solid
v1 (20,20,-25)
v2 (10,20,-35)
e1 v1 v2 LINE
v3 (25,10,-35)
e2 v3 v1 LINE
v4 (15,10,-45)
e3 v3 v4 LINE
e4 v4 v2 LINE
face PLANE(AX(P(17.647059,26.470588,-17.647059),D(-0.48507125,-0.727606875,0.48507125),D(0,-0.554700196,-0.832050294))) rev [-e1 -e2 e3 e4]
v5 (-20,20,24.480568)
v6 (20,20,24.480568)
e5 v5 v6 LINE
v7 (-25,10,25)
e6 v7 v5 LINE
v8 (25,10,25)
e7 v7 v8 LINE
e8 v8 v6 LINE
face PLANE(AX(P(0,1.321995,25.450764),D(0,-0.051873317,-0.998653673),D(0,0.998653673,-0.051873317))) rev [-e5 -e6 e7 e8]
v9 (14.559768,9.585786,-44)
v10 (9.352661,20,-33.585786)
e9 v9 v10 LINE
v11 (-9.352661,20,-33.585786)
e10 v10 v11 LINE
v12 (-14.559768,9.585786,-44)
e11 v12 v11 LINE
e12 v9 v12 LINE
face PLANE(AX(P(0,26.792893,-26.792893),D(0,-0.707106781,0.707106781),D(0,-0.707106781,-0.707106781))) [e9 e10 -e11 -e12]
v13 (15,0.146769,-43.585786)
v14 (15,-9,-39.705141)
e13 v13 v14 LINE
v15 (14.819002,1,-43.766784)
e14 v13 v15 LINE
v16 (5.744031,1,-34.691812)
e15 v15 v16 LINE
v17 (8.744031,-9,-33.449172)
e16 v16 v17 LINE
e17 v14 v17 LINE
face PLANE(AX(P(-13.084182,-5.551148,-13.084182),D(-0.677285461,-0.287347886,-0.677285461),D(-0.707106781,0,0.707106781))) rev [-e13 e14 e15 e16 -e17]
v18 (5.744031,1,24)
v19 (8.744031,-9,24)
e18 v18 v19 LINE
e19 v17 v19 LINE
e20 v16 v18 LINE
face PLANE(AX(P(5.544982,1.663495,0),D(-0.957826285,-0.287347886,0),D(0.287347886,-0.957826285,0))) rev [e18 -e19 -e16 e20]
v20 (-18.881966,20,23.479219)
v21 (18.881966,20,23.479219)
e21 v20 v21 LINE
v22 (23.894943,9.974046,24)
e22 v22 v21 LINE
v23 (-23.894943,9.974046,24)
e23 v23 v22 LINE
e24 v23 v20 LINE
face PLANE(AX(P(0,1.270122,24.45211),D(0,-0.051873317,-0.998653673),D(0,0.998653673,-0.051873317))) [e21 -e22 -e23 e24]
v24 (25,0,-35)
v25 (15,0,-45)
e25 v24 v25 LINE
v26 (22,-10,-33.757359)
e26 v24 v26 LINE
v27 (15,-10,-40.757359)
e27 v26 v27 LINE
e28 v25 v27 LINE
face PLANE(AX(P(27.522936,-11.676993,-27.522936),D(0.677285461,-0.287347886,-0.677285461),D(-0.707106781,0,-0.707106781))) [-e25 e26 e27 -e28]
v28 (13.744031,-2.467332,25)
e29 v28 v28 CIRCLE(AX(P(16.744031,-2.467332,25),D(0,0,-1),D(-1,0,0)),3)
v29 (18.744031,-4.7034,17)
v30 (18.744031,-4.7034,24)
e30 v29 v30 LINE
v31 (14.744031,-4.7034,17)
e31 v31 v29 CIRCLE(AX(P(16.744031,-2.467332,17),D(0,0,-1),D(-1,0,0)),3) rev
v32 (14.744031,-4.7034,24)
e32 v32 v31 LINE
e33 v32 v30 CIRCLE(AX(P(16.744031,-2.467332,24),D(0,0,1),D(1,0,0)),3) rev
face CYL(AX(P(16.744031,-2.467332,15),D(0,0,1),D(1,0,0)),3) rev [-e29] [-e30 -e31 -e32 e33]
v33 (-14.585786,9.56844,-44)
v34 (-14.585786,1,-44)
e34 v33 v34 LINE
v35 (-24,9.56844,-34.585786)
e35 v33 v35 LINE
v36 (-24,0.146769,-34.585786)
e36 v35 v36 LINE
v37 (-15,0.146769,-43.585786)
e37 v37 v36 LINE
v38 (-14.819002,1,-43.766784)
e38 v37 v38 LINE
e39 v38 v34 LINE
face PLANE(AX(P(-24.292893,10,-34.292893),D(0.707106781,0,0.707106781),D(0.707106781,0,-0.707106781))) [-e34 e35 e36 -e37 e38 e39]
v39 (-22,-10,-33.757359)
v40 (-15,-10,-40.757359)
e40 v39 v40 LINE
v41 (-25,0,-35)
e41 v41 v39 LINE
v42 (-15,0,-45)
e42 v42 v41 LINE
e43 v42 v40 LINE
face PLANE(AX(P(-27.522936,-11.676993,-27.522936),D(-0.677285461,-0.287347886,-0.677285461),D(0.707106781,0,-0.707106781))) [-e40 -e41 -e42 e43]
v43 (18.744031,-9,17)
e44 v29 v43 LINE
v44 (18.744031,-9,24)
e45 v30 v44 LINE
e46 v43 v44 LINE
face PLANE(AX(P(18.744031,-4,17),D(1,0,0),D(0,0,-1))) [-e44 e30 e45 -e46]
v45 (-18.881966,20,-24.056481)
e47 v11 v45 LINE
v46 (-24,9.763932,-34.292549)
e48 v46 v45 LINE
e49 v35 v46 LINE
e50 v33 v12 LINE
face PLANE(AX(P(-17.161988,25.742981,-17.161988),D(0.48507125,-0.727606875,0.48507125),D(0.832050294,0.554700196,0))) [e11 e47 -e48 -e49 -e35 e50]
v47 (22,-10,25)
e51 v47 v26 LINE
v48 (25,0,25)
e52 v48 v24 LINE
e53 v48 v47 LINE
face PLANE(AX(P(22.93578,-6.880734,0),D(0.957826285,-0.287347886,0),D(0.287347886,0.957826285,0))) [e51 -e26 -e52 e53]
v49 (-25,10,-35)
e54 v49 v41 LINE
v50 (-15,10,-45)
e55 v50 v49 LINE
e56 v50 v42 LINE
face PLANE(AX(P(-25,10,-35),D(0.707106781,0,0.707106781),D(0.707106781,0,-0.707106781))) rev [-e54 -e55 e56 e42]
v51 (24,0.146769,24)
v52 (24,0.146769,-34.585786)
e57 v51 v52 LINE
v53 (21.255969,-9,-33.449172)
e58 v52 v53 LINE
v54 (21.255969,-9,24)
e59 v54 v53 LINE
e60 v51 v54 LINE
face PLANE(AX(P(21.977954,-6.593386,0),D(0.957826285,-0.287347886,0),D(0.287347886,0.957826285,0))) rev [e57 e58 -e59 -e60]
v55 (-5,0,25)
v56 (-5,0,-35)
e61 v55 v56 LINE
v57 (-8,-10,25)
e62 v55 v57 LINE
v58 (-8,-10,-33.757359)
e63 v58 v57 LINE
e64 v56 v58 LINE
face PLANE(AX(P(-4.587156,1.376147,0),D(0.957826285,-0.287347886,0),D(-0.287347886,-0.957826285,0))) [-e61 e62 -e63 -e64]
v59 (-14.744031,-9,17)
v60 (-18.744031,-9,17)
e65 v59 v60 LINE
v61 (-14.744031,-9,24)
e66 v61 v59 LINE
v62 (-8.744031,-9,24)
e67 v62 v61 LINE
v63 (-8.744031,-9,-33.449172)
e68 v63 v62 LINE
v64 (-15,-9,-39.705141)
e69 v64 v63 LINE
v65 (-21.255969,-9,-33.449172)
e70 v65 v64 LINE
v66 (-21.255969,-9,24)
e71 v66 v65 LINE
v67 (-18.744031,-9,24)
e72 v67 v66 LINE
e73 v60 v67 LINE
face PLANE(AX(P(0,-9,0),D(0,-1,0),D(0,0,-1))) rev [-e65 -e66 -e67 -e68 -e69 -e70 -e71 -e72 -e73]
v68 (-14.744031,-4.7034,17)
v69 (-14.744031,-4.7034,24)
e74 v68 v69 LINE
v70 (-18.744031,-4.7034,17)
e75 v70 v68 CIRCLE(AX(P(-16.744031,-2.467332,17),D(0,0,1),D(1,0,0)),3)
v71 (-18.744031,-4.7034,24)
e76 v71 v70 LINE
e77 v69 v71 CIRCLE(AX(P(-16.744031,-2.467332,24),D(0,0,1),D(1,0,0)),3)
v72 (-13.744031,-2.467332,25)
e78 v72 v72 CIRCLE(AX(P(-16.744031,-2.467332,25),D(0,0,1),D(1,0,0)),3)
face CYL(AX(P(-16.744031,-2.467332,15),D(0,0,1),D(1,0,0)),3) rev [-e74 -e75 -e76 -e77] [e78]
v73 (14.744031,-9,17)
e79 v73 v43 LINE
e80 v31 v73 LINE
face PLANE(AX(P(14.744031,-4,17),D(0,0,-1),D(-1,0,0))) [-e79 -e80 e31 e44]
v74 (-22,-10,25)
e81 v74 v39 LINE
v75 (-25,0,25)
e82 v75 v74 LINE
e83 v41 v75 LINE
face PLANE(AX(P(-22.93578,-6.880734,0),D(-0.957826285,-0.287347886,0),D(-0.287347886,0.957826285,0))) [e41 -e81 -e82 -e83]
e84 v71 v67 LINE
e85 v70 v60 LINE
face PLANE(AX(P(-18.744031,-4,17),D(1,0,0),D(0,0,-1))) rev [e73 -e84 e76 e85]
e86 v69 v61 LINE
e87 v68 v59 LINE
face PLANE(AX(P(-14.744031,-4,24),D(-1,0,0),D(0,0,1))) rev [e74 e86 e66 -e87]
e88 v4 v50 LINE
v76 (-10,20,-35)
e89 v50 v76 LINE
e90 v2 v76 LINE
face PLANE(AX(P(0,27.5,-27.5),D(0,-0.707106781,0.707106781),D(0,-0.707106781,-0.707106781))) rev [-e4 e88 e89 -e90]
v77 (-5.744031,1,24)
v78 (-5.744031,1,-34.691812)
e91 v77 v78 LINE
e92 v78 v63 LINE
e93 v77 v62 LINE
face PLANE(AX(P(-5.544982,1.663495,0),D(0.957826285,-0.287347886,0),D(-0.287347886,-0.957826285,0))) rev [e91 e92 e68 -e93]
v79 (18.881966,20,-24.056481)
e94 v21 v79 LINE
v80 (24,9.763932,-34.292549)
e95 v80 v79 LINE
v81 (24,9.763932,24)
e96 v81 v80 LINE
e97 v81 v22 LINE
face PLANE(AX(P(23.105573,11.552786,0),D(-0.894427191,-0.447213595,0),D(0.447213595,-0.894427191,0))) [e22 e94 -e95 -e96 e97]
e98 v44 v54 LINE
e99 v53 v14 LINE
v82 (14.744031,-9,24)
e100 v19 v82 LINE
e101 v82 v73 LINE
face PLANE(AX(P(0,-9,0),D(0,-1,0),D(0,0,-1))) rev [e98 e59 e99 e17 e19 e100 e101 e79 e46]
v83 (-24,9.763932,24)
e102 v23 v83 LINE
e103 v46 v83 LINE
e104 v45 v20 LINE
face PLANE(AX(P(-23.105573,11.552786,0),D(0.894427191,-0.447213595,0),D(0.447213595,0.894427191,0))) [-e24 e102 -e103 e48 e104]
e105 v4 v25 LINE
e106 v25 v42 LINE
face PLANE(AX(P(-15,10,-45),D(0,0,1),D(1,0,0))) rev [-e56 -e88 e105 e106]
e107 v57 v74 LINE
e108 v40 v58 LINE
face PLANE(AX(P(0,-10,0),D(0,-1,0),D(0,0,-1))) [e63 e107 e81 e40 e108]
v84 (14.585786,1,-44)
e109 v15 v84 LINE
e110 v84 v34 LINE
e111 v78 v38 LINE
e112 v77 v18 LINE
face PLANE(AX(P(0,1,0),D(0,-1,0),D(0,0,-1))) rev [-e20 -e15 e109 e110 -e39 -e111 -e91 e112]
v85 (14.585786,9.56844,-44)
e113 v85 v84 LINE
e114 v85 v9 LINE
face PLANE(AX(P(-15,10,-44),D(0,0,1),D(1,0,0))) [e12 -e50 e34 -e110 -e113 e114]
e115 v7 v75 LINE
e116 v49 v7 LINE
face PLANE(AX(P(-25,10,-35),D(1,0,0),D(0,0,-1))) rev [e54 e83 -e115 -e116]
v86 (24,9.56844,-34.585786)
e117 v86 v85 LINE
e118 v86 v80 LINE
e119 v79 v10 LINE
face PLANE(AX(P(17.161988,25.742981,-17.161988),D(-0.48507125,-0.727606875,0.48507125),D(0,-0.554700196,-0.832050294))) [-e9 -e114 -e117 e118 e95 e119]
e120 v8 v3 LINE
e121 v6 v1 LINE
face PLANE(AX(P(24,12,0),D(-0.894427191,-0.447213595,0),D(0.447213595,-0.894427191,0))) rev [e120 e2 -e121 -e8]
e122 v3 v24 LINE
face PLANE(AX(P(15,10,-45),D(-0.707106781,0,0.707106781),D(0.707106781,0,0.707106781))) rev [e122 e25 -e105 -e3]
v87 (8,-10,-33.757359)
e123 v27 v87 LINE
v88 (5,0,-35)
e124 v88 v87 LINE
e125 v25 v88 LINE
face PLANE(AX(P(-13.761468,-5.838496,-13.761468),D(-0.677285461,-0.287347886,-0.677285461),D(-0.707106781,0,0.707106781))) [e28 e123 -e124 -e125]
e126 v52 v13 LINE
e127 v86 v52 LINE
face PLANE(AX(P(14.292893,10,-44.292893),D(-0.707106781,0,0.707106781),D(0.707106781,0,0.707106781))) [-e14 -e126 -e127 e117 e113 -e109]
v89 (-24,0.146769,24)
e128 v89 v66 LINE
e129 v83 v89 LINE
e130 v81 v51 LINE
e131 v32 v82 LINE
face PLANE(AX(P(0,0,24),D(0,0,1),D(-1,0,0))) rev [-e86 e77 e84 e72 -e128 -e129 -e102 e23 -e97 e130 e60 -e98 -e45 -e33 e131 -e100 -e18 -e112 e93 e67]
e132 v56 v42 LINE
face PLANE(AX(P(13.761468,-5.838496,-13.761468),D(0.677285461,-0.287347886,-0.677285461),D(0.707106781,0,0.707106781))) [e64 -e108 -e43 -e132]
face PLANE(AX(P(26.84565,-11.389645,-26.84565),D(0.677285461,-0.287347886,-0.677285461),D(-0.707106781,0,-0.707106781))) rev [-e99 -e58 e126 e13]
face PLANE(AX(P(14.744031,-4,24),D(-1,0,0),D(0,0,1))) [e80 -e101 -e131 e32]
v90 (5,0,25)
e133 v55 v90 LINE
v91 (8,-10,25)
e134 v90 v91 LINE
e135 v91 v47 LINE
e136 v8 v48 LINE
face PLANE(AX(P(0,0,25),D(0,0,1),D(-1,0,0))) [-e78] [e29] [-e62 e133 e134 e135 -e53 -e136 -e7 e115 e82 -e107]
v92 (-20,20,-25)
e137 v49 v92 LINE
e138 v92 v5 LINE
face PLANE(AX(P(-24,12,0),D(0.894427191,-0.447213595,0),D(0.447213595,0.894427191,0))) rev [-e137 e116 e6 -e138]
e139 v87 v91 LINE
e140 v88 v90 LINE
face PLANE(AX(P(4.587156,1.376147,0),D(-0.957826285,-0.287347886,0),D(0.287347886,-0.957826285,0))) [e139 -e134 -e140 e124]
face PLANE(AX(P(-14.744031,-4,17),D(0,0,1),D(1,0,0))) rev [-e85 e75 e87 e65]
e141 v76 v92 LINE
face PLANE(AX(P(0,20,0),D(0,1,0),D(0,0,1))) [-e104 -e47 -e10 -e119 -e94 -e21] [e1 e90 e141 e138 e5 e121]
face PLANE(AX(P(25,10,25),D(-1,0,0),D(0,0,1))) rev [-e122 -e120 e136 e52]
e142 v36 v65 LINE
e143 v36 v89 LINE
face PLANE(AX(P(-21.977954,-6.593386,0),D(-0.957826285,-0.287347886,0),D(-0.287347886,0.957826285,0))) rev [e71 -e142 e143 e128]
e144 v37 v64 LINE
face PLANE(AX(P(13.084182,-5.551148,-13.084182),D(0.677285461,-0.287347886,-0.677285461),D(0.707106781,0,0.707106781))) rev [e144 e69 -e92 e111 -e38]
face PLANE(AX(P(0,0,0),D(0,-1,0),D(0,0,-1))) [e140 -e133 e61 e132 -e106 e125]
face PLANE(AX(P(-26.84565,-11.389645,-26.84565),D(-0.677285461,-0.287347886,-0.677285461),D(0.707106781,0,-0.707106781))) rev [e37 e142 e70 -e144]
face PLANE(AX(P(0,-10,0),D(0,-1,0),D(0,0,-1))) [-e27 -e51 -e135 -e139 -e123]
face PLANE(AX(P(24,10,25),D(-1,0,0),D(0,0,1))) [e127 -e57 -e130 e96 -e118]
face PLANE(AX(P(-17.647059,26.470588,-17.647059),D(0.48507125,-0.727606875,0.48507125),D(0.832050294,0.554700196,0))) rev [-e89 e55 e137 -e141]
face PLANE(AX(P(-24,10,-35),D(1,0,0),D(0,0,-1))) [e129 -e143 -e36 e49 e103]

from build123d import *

# Parameters (mm, degrees)
EXTRUDE_1_DEPTH     = 10
SHELL_2_T           = -1
SKETCH_8_W          = 4
SKETCH_8_H          = 7
EXTRUDE_3_DEPTH     = 5
SKETCH_9_R          = 3
CUT_EXTRUDE_1_DEPTH = 10


with BuildPart() as part:
    # 草图3 → 凸台-拉伸1 (new body)
    with BuildSketch(Plane(origin=(0, 0, 0), x_dir=(1, 0, 0), z_dir=(0, 1, 0))):
        Polygon((-25, 35), (-25, -25), (25, -25), (25, 35), (15, 45), (-15, 45), align=None)
    extrude(amount=EXTRUDE_1_DEPTH)


with BuildPart() as body_2:
    # 草图5 → 放样1 section 0
    with BuildSketch(Plane(origin=(0, 0, 0), x_dir=(1, 0, 0), z_dir=(0, 1, 0))):
        with BuildLine():
            Line((25, 35), (15, 45))
            Line((15, 45), (5, 35))
            Line((5, 35), (5, -25))
            Line((5, -25), (25, -25))
            Line((25, -25), (25, 35))
        make_face()
    # 草图6 → 放样1 section 1
    with BuildSketch(Plane(origin=(0, -10, 0), x_dir=(1, 0, 0), z_dir=(0, 1, 0))):
        with BuildLine():
            Line((22, -25), (8, -25))
            Line((8, -25), (8, 33.757359313))
            Line((8, 33.757359313), (15, 40.757359313))
            Line((15, 40.757359313), (22, 33.757359313))
            Line((22, 33.757359313), (22, -25))
        make_face()
    loft()


with BuildPart() as body_3:
    # 镜向2: mirrored copy
    add(body_2.part.mirror(Plane(origin=(0, 0, 0), x_dir=(0, 0, 1), z_dir=(1, 0, 0))))


with BuildPart() as part_1:
    add(part.part)

    # 相交1: read off the stored shape, not the designer's step
    # 相交1: union body 3, body 2
    add(body_3.part)
    add(body_2.part)

    # 草图7 → section 1 of loft_2
    with BuildSketch(Plane(origin=(0, 20, 0), x_dir=(1, 0, 0), z_dir=(0, 1, 0)), mode=Mode.PRIVATE) as loft_2_s1:
        with BuildLine():
            Line((-20, -24.480567501), (20, -24.480567501))
            Line((20, -24.480567501), (20, 25))
            Line((20, 25), (10, 35))
            Line((10, 35), (-10, 35))
            Line((-10, 35), (-20, 25))
            Line((-20, 25), (-20, -24.480567501))
        make_face()
    # loft from a face of the part (loft_2)
    loft([part_1.faces().sort_by_distance((0, 10, -9.068627451))[0], loft_2_s1.sketch])

    # 抽壳2
    shell_2_openings = [part_1.faces().sort_by_distance(p)[0] for p in [
        (0, 20, -4.10112168),
    ]]
    offset(amount=SHELL_2_T, openings=shell_2_openings, kind=Kind.INTERSECTION)

    # 草图8 → 凸台-拉伸3 (add)
    with BuildSketch(Plane(origin=(0, -9, 0), x_dir=(1, 0, 0), z_dir=(0, 1, 0))):
        with Locations((-16.744030651, -20.5)):
            Rectangle(SKETCH_8_W, SKETCH_8_H)
    extrude_3 = extrude(amount=EXTRUDE_3_DEPTH)

    # 草图9 → 切除-拉伸1 (cut)
    with BuildSketch(Plane.XY.offset(25)):
        with Locations((-16.744030651, -2.467331557)):
            Circle(SKETCH_9_R)
    cut_extrude_1 = extrude(amount=-CUT_EXTRUDE_1_DEPTH, mode=Mode.SUBTRACT)

    # 镜向3: 凸台-拉伸3, 切除-拉伸1 across plane
    add(extrude_3.mirror(Plane(origin=(0, 0, 0), x_dir=(0, 0, 1), z_dir=(1, 0, 0))))
    add(cut_extrude_1.mirror(Plane(origin=(0, 0, 0), x_dir=(0, 0, 1), z_dir=(1, 0, 0))), mode=Mode.SUBTRACT)


solid = part_1.part
